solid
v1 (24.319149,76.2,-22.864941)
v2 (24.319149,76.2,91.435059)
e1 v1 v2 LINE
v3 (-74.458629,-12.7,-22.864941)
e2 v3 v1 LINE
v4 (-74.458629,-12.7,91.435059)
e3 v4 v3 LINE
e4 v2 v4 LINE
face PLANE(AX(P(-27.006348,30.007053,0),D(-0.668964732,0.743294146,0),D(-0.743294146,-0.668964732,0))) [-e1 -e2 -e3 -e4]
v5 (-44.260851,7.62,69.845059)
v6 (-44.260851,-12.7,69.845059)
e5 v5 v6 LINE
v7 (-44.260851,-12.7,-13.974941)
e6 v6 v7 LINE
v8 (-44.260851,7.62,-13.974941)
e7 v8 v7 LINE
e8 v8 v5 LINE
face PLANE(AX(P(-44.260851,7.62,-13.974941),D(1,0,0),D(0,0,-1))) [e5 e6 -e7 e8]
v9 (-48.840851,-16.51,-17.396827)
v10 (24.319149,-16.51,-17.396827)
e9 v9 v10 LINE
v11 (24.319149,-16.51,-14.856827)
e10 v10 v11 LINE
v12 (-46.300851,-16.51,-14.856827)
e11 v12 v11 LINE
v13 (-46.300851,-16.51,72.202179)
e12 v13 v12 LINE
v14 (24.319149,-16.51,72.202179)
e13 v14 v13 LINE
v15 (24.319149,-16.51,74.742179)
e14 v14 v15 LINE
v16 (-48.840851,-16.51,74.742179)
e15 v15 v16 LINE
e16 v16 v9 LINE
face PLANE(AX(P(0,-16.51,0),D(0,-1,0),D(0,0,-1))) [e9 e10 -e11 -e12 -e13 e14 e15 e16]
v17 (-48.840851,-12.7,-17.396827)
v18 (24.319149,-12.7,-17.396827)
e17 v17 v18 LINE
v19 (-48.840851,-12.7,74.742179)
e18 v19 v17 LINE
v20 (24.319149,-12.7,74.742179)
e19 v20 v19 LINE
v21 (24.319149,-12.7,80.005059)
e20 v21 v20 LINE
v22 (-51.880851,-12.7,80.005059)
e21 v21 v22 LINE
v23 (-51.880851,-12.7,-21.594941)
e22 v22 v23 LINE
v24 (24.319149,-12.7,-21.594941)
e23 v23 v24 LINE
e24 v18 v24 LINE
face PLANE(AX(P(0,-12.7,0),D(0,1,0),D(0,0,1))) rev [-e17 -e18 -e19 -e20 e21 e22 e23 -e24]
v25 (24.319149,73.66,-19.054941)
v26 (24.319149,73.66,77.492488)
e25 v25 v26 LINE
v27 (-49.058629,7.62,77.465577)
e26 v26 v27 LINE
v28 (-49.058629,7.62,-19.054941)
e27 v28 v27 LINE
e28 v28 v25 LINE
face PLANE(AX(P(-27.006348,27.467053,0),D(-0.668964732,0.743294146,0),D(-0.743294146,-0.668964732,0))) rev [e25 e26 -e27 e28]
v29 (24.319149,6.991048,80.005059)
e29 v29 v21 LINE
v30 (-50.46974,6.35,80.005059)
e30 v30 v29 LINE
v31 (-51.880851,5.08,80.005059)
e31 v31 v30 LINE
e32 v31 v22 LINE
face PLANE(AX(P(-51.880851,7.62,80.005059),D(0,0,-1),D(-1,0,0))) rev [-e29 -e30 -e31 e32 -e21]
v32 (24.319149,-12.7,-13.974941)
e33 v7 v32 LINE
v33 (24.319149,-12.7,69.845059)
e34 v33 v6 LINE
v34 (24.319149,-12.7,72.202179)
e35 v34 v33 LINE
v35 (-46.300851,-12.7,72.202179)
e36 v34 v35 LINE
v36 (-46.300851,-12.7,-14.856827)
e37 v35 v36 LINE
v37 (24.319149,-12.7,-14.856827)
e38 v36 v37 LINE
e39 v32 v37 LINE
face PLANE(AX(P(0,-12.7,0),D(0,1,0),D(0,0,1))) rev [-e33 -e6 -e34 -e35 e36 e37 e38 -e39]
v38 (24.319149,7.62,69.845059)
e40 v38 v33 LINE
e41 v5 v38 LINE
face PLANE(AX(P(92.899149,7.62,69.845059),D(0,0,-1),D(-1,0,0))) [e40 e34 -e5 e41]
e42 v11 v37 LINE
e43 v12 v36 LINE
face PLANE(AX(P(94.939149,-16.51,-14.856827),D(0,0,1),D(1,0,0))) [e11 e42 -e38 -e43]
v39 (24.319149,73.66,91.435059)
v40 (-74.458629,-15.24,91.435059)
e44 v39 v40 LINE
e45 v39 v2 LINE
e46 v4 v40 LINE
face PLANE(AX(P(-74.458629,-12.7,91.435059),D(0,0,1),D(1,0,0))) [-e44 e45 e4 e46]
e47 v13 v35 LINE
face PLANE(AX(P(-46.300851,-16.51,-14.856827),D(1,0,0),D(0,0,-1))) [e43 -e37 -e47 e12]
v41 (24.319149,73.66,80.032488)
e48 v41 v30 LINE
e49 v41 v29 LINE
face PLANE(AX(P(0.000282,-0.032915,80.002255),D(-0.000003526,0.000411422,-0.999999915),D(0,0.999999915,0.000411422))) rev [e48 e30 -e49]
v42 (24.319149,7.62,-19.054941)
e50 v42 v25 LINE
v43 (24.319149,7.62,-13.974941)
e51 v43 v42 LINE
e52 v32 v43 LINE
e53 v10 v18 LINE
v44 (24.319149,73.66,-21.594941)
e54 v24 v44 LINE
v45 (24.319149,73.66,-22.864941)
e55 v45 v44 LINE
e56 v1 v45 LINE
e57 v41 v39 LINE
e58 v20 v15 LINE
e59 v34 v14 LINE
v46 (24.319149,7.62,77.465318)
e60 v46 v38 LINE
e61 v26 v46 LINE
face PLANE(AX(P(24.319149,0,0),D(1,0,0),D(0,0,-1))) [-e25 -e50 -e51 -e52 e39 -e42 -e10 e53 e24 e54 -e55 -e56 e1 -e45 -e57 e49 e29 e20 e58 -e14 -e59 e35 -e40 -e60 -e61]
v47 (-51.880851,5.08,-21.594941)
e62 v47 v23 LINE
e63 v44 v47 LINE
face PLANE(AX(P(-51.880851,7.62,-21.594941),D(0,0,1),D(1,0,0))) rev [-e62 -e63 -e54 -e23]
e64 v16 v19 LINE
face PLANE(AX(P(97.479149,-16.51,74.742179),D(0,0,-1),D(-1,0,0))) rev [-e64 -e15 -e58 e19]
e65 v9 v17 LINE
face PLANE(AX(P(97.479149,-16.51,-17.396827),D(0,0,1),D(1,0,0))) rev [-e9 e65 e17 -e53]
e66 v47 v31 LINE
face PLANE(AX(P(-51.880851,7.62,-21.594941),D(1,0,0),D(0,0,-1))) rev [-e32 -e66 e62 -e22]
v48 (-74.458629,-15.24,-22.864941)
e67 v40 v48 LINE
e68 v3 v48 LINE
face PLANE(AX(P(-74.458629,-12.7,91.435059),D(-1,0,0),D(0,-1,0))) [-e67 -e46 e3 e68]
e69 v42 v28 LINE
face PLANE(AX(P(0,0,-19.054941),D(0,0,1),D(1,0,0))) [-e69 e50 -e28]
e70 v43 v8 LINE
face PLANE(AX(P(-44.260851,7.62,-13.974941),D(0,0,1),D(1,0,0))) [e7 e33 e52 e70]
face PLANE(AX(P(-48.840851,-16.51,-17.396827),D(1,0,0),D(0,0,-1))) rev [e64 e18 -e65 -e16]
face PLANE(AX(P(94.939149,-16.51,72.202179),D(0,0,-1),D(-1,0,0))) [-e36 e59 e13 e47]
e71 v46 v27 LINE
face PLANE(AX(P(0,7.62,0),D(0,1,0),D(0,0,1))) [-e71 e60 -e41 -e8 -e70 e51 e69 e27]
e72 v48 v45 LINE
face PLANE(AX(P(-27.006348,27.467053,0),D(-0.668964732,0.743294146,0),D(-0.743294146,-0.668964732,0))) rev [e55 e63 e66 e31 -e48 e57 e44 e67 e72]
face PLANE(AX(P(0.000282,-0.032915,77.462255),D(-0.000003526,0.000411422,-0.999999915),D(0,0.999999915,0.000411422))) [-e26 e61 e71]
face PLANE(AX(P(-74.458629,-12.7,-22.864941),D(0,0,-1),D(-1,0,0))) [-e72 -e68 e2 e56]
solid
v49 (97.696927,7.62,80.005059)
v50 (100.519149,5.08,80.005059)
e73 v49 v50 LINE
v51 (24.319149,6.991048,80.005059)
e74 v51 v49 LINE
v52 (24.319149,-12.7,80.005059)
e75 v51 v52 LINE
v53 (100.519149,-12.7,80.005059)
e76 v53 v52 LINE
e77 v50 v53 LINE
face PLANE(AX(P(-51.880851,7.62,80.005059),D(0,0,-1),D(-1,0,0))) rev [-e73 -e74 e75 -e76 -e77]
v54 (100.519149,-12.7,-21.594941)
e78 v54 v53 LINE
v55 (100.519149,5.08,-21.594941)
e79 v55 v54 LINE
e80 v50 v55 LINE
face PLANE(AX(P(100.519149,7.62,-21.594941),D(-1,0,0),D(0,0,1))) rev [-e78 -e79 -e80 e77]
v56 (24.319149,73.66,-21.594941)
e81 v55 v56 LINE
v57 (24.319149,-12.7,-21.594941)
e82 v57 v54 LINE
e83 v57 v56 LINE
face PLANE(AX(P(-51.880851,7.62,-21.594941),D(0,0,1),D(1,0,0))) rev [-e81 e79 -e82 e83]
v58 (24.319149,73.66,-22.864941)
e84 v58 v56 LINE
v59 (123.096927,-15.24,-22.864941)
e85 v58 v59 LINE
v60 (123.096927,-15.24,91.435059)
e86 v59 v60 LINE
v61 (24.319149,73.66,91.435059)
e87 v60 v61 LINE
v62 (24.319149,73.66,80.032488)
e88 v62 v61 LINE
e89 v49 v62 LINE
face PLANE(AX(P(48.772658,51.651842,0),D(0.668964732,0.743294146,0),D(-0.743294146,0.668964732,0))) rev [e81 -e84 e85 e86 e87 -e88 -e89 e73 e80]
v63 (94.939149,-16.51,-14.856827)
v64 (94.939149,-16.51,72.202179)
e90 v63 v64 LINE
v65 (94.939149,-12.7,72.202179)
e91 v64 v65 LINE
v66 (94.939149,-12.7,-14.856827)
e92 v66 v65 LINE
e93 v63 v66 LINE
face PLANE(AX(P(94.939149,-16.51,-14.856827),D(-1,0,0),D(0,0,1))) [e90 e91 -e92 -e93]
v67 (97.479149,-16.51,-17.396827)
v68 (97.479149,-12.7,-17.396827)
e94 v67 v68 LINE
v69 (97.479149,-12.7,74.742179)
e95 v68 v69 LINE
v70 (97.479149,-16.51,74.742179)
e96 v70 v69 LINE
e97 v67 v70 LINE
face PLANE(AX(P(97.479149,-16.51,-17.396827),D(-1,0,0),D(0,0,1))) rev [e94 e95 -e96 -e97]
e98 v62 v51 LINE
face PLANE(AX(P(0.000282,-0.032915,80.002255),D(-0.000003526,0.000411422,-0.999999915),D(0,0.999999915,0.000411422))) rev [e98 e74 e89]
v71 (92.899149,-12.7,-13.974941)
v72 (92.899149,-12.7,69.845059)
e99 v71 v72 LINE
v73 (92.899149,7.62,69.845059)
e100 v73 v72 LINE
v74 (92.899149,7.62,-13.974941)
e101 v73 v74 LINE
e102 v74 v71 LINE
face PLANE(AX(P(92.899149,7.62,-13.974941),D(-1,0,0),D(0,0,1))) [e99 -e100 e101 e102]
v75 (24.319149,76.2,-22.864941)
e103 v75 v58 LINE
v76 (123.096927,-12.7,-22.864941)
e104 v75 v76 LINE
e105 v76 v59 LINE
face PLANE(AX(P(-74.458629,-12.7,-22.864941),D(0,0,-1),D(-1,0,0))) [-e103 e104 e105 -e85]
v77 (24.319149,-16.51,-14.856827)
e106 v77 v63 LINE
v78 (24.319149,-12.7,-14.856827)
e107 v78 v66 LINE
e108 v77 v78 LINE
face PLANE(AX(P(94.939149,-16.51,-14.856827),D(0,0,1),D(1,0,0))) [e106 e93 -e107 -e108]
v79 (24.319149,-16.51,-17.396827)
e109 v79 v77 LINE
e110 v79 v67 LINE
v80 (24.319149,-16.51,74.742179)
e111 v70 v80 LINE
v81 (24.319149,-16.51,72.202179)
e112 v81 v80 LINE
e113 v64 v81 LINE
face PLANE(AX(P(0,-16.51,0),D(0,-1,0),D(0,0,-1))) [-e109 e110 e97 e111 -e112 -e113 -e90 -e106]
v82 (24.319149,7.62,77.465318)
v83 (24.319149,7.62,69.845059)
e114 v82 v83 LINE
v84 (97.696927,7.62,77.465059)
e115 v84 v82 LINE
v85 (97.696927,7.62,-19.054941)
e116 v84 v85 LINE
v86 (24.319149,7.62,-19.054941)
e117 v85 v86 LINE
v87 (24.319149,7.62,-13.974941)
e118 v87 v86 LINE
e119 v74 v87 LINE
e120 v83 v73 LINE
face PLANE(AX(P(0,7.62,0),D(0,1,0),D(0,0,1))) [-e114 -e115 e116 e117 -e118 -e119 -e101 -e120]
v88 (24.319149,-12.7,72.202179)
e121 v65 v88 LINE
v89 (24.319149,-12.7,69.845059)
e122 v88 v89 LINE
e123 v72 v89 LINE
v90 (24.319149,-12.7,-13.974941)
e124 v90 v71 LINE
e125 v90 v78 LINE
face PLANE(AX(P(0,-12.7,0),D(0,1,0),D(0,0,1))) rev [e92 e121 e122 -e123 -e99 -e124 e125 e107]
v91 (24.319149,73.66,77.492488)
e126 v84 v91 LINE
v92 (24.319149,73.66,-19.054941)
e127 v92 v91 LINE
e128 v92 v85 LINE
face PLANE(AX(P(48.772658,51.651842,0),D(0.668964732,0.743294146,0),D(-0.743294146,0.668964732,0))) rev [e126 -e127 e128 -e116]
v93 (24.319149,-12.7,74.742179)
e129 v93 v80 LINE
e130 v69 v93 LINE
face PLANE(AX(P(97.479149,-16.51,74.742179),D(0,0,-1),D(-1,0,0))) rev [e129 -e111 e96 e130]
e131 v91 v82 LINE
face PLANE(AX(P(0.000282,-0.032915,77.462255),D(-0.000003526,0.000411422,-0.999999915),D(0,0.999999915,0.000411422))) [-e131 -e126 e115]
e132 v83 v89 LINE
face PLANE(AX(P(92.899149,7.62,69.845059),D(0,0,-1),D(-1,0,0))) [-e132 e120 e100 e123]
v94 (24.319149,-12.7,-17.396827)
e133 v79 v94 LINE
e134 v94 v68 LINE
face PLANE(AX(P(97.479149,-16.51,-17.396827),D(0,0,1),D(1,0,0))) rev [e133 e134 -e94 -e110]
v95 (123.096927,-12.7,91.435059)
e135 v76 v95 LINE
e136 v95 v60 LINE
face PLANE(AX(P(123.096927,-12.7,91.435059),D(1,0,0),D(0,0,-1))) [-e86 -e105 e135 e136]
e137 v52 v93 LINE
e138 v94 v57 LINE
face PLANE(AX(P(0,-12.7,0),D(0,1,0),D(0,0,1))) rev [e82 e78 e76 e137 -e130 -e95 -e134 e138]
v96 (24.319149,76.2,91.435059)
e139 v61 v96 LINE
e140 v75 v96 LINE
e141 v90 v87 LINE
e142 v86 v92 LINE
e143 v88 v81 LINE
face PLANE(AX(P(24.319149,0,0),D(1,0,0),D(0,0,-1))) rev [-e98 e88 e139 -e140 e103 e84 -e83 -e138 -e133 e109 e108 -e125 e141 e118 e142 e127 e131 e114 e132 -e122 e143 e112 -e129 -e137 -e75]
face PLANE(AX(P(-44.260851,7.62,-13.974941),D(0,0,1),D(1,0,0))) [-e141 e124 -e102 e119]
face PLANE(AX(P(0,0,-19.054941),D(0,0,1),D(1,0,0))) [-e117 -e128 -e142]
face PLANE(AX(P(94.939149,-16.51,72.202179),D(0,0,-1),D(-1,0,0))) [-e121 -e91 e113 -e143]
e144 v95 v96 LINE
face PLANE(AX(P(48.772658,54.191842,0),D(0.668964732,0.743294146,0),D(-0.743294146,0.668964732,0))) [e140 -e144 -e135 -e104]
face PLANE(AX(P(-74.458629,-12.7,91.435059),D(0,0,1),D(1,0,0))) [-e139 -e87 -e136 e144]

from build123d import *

# Parameters (mm, degrees)
SKETCH1_W           = 152.4
SKETCH1_H           = 101.6
SKETCH1_W_2         = 137.16
SKETCH1_H_2         = 83.82
BOSS_EXTRUDE1_DEPTH = 7.62
SKETCH1_4_W         = 152.4
SKETCH1_4_H         = 101.6
SKETCH1_4_W_2       = 137.16
SKETCH1_4_H_2       = 83.82
BOSS_EXTRUDE2_DEPTH = 12.7
BOSS_EXTRUDE3_DEPTH = 2.54
BOSS_EXTRUDE4_DEPTH = 2.54
BOSS_EXTRUDE6_START = 77.462262
BOSS_EXTRUDE6_DEPTH = 2.54
SKETCH4_W           = 146.32
SKETCH4_H           = 92.139006
SKETCH4_W_2         = 141.24
SKETCH4_H_2         = 87.059006
BOSS_EXTRUDE7_DEPTH = 3.81
BOSS_EXTRUDE5_DEPTH = 2.54


with BuildPart() as part:
    # Sketch1 → Boss-Extrude1 (new body)
    with BuildSketch(Plane(origin=(0, 0, 0), x_dir=(1, 0, 0), z_dir=(0, 1, 0))):
        with Locations((24.319149, -29.205059)):
            Rectangle(SKETCH1_W, SKETCH1_H)
        with Locations((24.319149, -27.935059)):
            Rectangle(SKETCH1_W_2, SKETCH1_H_2, mode=Mode.SUBTRACT)
    extrude(amount=BOSS_EXTRUDE1_DEPTH)

    # Sketch1<4> → Boss-Extrude2 (add)
    with BuildSketch(Plane(origin=(0, 0, 0), x_dir=(1, 0, 0), z_dir=(0, 1, 0))):
        with Locations((24.319149, -29.205059)):
            Rectangle(SKETCH1_4_W, SKETCH1_4_H)
        with Locations((24.319149, -27.935059)):
            Rectangle(SKETCH1_4_W_2, SKETCH1_4_H_2, mode=Mode.SUBTRACT)
    extrude(amount=-BOSS_EXTRUDE2_DEPTH)

    # 3DSketch1 → Boss-Extrude3 (add, along a direction that is not the sketch's normal)
    with BuildSketch(Plane(origin=(-74.458629, -12.7, 91.435059), x_dir=(0.5635274514996128, 0.5071747063496513, -0.6520817653066956), z_dir=(0.6689647316224498, -0.7432941462471663, 0))):
        Polygon((0, 0), (100.751821, 86.65639), (175.284767, 0), (74.532946, -86.65639), align=None)
    extrude(amount=BOSS_EXTRUDE3_DEPTH, dir=(0, -1, 0))

    # 3DSketch2 → Boss-Extrude4 (add, along a direction that is not the sketch's normal)
    with BuildSketch(Plane(origin=(24.319149, 76.2, 91.435059), x_dir=(0.563527451499613, -0.5071747063496519, -0.6520817653066951), z_dir=(-0.6689647316224497, -0.7432941462471663, 0))):
        Polygon((0, 0), (100.751821, 86.65639), (175.284767, 0), (74.532946, -86.65639), align=None)
    extrude(amount=BOSS_EXTRUDE4_DEPTH, dir=(0, -1, 0))


with BuildPart() as boss_extrude6_tool:
    # Boss-Extrude6: read off the stored shape, not the designer's step
    # Boss-Extrude6 outline → Boss-Extrude6 (new body)
    with BuildSketch(Plane(origin=(0, 0, 0), x_dir=(0.999999999993782, 1.4508726198126203e-09, -3.5264782604969394e-06), z_dir=(3.526478558957771e-06, -0.00041142249854835217, 0.9999999153595424)).offset(BOSS_EXTRUDE6_START)):
        Polygon((97.696645, 7.652915), (24.318867, 73.692921), (-50.470022, 6.382915), (97.574726, 7.65187), (97.696654, 7.65187), (97.695503, 7.652905), align=None)
    extrude(amount=BOSS_EXTRUDE6_DEPTH)


with BuildPart() as part_1:
    add(part.part)


with BuildPart() as part_2:
    # Boss-Extrude6: joined with boss_extrude6_tool
    add(part_1.part.fuse(boss_extrude6_tool.part, tol=0.00001))

    # Sketch4 → Boss-Extrude7 (add)
    with BuildSketch(Plane.XZ.offset(12.7)):
        with Locations((24.319149, 28.672676)):
            Rectangle(SKETCH4_W, SKETCH4_H)
        with Locations((24.319149, 28.672676)):
            Rectangle(SKETCH4_W_2, SKETCH4_H_2, mode=Mode.SUBTRACT)
    extrude(amount=BOSS_EXTRUDE7_DEPTH)

    # 3DSketch6 → Boss-Extrude5 (add)
    with BuildSketch(Plane(origin=(97.696927, 7.62, -21.594941), x_dir=(-1, 0, 0), z_dir=(0, 0, -1))):
        Polygon((0, 0), (146.755556, 0), (73.377778, 66.04), align=None)
    extrude(amount=-BOSS_EXTRUDE5_DEPTH)


with BuildPart() as body_2:
    # Split1: the piece on the far side of the plane
    add(part_2.part)
    split(bisect_by=Plane(origin=(24.319149, 0, 0), x_dir=(0, 0, 1), z_dir=(1, 0, 0)), keep=Keep.BOTTOM)


with BuildPart() as part_3:
    add(part_2.part)

    # Split1
    split(bisect_by=Plane(origin=(24.319149, 0, 0), x_dir=(0, 0, 1), z_dir=(1, 0, 0)), keep=Keep.TOP)


solid = Compound([body_2.part, part_3.part])
